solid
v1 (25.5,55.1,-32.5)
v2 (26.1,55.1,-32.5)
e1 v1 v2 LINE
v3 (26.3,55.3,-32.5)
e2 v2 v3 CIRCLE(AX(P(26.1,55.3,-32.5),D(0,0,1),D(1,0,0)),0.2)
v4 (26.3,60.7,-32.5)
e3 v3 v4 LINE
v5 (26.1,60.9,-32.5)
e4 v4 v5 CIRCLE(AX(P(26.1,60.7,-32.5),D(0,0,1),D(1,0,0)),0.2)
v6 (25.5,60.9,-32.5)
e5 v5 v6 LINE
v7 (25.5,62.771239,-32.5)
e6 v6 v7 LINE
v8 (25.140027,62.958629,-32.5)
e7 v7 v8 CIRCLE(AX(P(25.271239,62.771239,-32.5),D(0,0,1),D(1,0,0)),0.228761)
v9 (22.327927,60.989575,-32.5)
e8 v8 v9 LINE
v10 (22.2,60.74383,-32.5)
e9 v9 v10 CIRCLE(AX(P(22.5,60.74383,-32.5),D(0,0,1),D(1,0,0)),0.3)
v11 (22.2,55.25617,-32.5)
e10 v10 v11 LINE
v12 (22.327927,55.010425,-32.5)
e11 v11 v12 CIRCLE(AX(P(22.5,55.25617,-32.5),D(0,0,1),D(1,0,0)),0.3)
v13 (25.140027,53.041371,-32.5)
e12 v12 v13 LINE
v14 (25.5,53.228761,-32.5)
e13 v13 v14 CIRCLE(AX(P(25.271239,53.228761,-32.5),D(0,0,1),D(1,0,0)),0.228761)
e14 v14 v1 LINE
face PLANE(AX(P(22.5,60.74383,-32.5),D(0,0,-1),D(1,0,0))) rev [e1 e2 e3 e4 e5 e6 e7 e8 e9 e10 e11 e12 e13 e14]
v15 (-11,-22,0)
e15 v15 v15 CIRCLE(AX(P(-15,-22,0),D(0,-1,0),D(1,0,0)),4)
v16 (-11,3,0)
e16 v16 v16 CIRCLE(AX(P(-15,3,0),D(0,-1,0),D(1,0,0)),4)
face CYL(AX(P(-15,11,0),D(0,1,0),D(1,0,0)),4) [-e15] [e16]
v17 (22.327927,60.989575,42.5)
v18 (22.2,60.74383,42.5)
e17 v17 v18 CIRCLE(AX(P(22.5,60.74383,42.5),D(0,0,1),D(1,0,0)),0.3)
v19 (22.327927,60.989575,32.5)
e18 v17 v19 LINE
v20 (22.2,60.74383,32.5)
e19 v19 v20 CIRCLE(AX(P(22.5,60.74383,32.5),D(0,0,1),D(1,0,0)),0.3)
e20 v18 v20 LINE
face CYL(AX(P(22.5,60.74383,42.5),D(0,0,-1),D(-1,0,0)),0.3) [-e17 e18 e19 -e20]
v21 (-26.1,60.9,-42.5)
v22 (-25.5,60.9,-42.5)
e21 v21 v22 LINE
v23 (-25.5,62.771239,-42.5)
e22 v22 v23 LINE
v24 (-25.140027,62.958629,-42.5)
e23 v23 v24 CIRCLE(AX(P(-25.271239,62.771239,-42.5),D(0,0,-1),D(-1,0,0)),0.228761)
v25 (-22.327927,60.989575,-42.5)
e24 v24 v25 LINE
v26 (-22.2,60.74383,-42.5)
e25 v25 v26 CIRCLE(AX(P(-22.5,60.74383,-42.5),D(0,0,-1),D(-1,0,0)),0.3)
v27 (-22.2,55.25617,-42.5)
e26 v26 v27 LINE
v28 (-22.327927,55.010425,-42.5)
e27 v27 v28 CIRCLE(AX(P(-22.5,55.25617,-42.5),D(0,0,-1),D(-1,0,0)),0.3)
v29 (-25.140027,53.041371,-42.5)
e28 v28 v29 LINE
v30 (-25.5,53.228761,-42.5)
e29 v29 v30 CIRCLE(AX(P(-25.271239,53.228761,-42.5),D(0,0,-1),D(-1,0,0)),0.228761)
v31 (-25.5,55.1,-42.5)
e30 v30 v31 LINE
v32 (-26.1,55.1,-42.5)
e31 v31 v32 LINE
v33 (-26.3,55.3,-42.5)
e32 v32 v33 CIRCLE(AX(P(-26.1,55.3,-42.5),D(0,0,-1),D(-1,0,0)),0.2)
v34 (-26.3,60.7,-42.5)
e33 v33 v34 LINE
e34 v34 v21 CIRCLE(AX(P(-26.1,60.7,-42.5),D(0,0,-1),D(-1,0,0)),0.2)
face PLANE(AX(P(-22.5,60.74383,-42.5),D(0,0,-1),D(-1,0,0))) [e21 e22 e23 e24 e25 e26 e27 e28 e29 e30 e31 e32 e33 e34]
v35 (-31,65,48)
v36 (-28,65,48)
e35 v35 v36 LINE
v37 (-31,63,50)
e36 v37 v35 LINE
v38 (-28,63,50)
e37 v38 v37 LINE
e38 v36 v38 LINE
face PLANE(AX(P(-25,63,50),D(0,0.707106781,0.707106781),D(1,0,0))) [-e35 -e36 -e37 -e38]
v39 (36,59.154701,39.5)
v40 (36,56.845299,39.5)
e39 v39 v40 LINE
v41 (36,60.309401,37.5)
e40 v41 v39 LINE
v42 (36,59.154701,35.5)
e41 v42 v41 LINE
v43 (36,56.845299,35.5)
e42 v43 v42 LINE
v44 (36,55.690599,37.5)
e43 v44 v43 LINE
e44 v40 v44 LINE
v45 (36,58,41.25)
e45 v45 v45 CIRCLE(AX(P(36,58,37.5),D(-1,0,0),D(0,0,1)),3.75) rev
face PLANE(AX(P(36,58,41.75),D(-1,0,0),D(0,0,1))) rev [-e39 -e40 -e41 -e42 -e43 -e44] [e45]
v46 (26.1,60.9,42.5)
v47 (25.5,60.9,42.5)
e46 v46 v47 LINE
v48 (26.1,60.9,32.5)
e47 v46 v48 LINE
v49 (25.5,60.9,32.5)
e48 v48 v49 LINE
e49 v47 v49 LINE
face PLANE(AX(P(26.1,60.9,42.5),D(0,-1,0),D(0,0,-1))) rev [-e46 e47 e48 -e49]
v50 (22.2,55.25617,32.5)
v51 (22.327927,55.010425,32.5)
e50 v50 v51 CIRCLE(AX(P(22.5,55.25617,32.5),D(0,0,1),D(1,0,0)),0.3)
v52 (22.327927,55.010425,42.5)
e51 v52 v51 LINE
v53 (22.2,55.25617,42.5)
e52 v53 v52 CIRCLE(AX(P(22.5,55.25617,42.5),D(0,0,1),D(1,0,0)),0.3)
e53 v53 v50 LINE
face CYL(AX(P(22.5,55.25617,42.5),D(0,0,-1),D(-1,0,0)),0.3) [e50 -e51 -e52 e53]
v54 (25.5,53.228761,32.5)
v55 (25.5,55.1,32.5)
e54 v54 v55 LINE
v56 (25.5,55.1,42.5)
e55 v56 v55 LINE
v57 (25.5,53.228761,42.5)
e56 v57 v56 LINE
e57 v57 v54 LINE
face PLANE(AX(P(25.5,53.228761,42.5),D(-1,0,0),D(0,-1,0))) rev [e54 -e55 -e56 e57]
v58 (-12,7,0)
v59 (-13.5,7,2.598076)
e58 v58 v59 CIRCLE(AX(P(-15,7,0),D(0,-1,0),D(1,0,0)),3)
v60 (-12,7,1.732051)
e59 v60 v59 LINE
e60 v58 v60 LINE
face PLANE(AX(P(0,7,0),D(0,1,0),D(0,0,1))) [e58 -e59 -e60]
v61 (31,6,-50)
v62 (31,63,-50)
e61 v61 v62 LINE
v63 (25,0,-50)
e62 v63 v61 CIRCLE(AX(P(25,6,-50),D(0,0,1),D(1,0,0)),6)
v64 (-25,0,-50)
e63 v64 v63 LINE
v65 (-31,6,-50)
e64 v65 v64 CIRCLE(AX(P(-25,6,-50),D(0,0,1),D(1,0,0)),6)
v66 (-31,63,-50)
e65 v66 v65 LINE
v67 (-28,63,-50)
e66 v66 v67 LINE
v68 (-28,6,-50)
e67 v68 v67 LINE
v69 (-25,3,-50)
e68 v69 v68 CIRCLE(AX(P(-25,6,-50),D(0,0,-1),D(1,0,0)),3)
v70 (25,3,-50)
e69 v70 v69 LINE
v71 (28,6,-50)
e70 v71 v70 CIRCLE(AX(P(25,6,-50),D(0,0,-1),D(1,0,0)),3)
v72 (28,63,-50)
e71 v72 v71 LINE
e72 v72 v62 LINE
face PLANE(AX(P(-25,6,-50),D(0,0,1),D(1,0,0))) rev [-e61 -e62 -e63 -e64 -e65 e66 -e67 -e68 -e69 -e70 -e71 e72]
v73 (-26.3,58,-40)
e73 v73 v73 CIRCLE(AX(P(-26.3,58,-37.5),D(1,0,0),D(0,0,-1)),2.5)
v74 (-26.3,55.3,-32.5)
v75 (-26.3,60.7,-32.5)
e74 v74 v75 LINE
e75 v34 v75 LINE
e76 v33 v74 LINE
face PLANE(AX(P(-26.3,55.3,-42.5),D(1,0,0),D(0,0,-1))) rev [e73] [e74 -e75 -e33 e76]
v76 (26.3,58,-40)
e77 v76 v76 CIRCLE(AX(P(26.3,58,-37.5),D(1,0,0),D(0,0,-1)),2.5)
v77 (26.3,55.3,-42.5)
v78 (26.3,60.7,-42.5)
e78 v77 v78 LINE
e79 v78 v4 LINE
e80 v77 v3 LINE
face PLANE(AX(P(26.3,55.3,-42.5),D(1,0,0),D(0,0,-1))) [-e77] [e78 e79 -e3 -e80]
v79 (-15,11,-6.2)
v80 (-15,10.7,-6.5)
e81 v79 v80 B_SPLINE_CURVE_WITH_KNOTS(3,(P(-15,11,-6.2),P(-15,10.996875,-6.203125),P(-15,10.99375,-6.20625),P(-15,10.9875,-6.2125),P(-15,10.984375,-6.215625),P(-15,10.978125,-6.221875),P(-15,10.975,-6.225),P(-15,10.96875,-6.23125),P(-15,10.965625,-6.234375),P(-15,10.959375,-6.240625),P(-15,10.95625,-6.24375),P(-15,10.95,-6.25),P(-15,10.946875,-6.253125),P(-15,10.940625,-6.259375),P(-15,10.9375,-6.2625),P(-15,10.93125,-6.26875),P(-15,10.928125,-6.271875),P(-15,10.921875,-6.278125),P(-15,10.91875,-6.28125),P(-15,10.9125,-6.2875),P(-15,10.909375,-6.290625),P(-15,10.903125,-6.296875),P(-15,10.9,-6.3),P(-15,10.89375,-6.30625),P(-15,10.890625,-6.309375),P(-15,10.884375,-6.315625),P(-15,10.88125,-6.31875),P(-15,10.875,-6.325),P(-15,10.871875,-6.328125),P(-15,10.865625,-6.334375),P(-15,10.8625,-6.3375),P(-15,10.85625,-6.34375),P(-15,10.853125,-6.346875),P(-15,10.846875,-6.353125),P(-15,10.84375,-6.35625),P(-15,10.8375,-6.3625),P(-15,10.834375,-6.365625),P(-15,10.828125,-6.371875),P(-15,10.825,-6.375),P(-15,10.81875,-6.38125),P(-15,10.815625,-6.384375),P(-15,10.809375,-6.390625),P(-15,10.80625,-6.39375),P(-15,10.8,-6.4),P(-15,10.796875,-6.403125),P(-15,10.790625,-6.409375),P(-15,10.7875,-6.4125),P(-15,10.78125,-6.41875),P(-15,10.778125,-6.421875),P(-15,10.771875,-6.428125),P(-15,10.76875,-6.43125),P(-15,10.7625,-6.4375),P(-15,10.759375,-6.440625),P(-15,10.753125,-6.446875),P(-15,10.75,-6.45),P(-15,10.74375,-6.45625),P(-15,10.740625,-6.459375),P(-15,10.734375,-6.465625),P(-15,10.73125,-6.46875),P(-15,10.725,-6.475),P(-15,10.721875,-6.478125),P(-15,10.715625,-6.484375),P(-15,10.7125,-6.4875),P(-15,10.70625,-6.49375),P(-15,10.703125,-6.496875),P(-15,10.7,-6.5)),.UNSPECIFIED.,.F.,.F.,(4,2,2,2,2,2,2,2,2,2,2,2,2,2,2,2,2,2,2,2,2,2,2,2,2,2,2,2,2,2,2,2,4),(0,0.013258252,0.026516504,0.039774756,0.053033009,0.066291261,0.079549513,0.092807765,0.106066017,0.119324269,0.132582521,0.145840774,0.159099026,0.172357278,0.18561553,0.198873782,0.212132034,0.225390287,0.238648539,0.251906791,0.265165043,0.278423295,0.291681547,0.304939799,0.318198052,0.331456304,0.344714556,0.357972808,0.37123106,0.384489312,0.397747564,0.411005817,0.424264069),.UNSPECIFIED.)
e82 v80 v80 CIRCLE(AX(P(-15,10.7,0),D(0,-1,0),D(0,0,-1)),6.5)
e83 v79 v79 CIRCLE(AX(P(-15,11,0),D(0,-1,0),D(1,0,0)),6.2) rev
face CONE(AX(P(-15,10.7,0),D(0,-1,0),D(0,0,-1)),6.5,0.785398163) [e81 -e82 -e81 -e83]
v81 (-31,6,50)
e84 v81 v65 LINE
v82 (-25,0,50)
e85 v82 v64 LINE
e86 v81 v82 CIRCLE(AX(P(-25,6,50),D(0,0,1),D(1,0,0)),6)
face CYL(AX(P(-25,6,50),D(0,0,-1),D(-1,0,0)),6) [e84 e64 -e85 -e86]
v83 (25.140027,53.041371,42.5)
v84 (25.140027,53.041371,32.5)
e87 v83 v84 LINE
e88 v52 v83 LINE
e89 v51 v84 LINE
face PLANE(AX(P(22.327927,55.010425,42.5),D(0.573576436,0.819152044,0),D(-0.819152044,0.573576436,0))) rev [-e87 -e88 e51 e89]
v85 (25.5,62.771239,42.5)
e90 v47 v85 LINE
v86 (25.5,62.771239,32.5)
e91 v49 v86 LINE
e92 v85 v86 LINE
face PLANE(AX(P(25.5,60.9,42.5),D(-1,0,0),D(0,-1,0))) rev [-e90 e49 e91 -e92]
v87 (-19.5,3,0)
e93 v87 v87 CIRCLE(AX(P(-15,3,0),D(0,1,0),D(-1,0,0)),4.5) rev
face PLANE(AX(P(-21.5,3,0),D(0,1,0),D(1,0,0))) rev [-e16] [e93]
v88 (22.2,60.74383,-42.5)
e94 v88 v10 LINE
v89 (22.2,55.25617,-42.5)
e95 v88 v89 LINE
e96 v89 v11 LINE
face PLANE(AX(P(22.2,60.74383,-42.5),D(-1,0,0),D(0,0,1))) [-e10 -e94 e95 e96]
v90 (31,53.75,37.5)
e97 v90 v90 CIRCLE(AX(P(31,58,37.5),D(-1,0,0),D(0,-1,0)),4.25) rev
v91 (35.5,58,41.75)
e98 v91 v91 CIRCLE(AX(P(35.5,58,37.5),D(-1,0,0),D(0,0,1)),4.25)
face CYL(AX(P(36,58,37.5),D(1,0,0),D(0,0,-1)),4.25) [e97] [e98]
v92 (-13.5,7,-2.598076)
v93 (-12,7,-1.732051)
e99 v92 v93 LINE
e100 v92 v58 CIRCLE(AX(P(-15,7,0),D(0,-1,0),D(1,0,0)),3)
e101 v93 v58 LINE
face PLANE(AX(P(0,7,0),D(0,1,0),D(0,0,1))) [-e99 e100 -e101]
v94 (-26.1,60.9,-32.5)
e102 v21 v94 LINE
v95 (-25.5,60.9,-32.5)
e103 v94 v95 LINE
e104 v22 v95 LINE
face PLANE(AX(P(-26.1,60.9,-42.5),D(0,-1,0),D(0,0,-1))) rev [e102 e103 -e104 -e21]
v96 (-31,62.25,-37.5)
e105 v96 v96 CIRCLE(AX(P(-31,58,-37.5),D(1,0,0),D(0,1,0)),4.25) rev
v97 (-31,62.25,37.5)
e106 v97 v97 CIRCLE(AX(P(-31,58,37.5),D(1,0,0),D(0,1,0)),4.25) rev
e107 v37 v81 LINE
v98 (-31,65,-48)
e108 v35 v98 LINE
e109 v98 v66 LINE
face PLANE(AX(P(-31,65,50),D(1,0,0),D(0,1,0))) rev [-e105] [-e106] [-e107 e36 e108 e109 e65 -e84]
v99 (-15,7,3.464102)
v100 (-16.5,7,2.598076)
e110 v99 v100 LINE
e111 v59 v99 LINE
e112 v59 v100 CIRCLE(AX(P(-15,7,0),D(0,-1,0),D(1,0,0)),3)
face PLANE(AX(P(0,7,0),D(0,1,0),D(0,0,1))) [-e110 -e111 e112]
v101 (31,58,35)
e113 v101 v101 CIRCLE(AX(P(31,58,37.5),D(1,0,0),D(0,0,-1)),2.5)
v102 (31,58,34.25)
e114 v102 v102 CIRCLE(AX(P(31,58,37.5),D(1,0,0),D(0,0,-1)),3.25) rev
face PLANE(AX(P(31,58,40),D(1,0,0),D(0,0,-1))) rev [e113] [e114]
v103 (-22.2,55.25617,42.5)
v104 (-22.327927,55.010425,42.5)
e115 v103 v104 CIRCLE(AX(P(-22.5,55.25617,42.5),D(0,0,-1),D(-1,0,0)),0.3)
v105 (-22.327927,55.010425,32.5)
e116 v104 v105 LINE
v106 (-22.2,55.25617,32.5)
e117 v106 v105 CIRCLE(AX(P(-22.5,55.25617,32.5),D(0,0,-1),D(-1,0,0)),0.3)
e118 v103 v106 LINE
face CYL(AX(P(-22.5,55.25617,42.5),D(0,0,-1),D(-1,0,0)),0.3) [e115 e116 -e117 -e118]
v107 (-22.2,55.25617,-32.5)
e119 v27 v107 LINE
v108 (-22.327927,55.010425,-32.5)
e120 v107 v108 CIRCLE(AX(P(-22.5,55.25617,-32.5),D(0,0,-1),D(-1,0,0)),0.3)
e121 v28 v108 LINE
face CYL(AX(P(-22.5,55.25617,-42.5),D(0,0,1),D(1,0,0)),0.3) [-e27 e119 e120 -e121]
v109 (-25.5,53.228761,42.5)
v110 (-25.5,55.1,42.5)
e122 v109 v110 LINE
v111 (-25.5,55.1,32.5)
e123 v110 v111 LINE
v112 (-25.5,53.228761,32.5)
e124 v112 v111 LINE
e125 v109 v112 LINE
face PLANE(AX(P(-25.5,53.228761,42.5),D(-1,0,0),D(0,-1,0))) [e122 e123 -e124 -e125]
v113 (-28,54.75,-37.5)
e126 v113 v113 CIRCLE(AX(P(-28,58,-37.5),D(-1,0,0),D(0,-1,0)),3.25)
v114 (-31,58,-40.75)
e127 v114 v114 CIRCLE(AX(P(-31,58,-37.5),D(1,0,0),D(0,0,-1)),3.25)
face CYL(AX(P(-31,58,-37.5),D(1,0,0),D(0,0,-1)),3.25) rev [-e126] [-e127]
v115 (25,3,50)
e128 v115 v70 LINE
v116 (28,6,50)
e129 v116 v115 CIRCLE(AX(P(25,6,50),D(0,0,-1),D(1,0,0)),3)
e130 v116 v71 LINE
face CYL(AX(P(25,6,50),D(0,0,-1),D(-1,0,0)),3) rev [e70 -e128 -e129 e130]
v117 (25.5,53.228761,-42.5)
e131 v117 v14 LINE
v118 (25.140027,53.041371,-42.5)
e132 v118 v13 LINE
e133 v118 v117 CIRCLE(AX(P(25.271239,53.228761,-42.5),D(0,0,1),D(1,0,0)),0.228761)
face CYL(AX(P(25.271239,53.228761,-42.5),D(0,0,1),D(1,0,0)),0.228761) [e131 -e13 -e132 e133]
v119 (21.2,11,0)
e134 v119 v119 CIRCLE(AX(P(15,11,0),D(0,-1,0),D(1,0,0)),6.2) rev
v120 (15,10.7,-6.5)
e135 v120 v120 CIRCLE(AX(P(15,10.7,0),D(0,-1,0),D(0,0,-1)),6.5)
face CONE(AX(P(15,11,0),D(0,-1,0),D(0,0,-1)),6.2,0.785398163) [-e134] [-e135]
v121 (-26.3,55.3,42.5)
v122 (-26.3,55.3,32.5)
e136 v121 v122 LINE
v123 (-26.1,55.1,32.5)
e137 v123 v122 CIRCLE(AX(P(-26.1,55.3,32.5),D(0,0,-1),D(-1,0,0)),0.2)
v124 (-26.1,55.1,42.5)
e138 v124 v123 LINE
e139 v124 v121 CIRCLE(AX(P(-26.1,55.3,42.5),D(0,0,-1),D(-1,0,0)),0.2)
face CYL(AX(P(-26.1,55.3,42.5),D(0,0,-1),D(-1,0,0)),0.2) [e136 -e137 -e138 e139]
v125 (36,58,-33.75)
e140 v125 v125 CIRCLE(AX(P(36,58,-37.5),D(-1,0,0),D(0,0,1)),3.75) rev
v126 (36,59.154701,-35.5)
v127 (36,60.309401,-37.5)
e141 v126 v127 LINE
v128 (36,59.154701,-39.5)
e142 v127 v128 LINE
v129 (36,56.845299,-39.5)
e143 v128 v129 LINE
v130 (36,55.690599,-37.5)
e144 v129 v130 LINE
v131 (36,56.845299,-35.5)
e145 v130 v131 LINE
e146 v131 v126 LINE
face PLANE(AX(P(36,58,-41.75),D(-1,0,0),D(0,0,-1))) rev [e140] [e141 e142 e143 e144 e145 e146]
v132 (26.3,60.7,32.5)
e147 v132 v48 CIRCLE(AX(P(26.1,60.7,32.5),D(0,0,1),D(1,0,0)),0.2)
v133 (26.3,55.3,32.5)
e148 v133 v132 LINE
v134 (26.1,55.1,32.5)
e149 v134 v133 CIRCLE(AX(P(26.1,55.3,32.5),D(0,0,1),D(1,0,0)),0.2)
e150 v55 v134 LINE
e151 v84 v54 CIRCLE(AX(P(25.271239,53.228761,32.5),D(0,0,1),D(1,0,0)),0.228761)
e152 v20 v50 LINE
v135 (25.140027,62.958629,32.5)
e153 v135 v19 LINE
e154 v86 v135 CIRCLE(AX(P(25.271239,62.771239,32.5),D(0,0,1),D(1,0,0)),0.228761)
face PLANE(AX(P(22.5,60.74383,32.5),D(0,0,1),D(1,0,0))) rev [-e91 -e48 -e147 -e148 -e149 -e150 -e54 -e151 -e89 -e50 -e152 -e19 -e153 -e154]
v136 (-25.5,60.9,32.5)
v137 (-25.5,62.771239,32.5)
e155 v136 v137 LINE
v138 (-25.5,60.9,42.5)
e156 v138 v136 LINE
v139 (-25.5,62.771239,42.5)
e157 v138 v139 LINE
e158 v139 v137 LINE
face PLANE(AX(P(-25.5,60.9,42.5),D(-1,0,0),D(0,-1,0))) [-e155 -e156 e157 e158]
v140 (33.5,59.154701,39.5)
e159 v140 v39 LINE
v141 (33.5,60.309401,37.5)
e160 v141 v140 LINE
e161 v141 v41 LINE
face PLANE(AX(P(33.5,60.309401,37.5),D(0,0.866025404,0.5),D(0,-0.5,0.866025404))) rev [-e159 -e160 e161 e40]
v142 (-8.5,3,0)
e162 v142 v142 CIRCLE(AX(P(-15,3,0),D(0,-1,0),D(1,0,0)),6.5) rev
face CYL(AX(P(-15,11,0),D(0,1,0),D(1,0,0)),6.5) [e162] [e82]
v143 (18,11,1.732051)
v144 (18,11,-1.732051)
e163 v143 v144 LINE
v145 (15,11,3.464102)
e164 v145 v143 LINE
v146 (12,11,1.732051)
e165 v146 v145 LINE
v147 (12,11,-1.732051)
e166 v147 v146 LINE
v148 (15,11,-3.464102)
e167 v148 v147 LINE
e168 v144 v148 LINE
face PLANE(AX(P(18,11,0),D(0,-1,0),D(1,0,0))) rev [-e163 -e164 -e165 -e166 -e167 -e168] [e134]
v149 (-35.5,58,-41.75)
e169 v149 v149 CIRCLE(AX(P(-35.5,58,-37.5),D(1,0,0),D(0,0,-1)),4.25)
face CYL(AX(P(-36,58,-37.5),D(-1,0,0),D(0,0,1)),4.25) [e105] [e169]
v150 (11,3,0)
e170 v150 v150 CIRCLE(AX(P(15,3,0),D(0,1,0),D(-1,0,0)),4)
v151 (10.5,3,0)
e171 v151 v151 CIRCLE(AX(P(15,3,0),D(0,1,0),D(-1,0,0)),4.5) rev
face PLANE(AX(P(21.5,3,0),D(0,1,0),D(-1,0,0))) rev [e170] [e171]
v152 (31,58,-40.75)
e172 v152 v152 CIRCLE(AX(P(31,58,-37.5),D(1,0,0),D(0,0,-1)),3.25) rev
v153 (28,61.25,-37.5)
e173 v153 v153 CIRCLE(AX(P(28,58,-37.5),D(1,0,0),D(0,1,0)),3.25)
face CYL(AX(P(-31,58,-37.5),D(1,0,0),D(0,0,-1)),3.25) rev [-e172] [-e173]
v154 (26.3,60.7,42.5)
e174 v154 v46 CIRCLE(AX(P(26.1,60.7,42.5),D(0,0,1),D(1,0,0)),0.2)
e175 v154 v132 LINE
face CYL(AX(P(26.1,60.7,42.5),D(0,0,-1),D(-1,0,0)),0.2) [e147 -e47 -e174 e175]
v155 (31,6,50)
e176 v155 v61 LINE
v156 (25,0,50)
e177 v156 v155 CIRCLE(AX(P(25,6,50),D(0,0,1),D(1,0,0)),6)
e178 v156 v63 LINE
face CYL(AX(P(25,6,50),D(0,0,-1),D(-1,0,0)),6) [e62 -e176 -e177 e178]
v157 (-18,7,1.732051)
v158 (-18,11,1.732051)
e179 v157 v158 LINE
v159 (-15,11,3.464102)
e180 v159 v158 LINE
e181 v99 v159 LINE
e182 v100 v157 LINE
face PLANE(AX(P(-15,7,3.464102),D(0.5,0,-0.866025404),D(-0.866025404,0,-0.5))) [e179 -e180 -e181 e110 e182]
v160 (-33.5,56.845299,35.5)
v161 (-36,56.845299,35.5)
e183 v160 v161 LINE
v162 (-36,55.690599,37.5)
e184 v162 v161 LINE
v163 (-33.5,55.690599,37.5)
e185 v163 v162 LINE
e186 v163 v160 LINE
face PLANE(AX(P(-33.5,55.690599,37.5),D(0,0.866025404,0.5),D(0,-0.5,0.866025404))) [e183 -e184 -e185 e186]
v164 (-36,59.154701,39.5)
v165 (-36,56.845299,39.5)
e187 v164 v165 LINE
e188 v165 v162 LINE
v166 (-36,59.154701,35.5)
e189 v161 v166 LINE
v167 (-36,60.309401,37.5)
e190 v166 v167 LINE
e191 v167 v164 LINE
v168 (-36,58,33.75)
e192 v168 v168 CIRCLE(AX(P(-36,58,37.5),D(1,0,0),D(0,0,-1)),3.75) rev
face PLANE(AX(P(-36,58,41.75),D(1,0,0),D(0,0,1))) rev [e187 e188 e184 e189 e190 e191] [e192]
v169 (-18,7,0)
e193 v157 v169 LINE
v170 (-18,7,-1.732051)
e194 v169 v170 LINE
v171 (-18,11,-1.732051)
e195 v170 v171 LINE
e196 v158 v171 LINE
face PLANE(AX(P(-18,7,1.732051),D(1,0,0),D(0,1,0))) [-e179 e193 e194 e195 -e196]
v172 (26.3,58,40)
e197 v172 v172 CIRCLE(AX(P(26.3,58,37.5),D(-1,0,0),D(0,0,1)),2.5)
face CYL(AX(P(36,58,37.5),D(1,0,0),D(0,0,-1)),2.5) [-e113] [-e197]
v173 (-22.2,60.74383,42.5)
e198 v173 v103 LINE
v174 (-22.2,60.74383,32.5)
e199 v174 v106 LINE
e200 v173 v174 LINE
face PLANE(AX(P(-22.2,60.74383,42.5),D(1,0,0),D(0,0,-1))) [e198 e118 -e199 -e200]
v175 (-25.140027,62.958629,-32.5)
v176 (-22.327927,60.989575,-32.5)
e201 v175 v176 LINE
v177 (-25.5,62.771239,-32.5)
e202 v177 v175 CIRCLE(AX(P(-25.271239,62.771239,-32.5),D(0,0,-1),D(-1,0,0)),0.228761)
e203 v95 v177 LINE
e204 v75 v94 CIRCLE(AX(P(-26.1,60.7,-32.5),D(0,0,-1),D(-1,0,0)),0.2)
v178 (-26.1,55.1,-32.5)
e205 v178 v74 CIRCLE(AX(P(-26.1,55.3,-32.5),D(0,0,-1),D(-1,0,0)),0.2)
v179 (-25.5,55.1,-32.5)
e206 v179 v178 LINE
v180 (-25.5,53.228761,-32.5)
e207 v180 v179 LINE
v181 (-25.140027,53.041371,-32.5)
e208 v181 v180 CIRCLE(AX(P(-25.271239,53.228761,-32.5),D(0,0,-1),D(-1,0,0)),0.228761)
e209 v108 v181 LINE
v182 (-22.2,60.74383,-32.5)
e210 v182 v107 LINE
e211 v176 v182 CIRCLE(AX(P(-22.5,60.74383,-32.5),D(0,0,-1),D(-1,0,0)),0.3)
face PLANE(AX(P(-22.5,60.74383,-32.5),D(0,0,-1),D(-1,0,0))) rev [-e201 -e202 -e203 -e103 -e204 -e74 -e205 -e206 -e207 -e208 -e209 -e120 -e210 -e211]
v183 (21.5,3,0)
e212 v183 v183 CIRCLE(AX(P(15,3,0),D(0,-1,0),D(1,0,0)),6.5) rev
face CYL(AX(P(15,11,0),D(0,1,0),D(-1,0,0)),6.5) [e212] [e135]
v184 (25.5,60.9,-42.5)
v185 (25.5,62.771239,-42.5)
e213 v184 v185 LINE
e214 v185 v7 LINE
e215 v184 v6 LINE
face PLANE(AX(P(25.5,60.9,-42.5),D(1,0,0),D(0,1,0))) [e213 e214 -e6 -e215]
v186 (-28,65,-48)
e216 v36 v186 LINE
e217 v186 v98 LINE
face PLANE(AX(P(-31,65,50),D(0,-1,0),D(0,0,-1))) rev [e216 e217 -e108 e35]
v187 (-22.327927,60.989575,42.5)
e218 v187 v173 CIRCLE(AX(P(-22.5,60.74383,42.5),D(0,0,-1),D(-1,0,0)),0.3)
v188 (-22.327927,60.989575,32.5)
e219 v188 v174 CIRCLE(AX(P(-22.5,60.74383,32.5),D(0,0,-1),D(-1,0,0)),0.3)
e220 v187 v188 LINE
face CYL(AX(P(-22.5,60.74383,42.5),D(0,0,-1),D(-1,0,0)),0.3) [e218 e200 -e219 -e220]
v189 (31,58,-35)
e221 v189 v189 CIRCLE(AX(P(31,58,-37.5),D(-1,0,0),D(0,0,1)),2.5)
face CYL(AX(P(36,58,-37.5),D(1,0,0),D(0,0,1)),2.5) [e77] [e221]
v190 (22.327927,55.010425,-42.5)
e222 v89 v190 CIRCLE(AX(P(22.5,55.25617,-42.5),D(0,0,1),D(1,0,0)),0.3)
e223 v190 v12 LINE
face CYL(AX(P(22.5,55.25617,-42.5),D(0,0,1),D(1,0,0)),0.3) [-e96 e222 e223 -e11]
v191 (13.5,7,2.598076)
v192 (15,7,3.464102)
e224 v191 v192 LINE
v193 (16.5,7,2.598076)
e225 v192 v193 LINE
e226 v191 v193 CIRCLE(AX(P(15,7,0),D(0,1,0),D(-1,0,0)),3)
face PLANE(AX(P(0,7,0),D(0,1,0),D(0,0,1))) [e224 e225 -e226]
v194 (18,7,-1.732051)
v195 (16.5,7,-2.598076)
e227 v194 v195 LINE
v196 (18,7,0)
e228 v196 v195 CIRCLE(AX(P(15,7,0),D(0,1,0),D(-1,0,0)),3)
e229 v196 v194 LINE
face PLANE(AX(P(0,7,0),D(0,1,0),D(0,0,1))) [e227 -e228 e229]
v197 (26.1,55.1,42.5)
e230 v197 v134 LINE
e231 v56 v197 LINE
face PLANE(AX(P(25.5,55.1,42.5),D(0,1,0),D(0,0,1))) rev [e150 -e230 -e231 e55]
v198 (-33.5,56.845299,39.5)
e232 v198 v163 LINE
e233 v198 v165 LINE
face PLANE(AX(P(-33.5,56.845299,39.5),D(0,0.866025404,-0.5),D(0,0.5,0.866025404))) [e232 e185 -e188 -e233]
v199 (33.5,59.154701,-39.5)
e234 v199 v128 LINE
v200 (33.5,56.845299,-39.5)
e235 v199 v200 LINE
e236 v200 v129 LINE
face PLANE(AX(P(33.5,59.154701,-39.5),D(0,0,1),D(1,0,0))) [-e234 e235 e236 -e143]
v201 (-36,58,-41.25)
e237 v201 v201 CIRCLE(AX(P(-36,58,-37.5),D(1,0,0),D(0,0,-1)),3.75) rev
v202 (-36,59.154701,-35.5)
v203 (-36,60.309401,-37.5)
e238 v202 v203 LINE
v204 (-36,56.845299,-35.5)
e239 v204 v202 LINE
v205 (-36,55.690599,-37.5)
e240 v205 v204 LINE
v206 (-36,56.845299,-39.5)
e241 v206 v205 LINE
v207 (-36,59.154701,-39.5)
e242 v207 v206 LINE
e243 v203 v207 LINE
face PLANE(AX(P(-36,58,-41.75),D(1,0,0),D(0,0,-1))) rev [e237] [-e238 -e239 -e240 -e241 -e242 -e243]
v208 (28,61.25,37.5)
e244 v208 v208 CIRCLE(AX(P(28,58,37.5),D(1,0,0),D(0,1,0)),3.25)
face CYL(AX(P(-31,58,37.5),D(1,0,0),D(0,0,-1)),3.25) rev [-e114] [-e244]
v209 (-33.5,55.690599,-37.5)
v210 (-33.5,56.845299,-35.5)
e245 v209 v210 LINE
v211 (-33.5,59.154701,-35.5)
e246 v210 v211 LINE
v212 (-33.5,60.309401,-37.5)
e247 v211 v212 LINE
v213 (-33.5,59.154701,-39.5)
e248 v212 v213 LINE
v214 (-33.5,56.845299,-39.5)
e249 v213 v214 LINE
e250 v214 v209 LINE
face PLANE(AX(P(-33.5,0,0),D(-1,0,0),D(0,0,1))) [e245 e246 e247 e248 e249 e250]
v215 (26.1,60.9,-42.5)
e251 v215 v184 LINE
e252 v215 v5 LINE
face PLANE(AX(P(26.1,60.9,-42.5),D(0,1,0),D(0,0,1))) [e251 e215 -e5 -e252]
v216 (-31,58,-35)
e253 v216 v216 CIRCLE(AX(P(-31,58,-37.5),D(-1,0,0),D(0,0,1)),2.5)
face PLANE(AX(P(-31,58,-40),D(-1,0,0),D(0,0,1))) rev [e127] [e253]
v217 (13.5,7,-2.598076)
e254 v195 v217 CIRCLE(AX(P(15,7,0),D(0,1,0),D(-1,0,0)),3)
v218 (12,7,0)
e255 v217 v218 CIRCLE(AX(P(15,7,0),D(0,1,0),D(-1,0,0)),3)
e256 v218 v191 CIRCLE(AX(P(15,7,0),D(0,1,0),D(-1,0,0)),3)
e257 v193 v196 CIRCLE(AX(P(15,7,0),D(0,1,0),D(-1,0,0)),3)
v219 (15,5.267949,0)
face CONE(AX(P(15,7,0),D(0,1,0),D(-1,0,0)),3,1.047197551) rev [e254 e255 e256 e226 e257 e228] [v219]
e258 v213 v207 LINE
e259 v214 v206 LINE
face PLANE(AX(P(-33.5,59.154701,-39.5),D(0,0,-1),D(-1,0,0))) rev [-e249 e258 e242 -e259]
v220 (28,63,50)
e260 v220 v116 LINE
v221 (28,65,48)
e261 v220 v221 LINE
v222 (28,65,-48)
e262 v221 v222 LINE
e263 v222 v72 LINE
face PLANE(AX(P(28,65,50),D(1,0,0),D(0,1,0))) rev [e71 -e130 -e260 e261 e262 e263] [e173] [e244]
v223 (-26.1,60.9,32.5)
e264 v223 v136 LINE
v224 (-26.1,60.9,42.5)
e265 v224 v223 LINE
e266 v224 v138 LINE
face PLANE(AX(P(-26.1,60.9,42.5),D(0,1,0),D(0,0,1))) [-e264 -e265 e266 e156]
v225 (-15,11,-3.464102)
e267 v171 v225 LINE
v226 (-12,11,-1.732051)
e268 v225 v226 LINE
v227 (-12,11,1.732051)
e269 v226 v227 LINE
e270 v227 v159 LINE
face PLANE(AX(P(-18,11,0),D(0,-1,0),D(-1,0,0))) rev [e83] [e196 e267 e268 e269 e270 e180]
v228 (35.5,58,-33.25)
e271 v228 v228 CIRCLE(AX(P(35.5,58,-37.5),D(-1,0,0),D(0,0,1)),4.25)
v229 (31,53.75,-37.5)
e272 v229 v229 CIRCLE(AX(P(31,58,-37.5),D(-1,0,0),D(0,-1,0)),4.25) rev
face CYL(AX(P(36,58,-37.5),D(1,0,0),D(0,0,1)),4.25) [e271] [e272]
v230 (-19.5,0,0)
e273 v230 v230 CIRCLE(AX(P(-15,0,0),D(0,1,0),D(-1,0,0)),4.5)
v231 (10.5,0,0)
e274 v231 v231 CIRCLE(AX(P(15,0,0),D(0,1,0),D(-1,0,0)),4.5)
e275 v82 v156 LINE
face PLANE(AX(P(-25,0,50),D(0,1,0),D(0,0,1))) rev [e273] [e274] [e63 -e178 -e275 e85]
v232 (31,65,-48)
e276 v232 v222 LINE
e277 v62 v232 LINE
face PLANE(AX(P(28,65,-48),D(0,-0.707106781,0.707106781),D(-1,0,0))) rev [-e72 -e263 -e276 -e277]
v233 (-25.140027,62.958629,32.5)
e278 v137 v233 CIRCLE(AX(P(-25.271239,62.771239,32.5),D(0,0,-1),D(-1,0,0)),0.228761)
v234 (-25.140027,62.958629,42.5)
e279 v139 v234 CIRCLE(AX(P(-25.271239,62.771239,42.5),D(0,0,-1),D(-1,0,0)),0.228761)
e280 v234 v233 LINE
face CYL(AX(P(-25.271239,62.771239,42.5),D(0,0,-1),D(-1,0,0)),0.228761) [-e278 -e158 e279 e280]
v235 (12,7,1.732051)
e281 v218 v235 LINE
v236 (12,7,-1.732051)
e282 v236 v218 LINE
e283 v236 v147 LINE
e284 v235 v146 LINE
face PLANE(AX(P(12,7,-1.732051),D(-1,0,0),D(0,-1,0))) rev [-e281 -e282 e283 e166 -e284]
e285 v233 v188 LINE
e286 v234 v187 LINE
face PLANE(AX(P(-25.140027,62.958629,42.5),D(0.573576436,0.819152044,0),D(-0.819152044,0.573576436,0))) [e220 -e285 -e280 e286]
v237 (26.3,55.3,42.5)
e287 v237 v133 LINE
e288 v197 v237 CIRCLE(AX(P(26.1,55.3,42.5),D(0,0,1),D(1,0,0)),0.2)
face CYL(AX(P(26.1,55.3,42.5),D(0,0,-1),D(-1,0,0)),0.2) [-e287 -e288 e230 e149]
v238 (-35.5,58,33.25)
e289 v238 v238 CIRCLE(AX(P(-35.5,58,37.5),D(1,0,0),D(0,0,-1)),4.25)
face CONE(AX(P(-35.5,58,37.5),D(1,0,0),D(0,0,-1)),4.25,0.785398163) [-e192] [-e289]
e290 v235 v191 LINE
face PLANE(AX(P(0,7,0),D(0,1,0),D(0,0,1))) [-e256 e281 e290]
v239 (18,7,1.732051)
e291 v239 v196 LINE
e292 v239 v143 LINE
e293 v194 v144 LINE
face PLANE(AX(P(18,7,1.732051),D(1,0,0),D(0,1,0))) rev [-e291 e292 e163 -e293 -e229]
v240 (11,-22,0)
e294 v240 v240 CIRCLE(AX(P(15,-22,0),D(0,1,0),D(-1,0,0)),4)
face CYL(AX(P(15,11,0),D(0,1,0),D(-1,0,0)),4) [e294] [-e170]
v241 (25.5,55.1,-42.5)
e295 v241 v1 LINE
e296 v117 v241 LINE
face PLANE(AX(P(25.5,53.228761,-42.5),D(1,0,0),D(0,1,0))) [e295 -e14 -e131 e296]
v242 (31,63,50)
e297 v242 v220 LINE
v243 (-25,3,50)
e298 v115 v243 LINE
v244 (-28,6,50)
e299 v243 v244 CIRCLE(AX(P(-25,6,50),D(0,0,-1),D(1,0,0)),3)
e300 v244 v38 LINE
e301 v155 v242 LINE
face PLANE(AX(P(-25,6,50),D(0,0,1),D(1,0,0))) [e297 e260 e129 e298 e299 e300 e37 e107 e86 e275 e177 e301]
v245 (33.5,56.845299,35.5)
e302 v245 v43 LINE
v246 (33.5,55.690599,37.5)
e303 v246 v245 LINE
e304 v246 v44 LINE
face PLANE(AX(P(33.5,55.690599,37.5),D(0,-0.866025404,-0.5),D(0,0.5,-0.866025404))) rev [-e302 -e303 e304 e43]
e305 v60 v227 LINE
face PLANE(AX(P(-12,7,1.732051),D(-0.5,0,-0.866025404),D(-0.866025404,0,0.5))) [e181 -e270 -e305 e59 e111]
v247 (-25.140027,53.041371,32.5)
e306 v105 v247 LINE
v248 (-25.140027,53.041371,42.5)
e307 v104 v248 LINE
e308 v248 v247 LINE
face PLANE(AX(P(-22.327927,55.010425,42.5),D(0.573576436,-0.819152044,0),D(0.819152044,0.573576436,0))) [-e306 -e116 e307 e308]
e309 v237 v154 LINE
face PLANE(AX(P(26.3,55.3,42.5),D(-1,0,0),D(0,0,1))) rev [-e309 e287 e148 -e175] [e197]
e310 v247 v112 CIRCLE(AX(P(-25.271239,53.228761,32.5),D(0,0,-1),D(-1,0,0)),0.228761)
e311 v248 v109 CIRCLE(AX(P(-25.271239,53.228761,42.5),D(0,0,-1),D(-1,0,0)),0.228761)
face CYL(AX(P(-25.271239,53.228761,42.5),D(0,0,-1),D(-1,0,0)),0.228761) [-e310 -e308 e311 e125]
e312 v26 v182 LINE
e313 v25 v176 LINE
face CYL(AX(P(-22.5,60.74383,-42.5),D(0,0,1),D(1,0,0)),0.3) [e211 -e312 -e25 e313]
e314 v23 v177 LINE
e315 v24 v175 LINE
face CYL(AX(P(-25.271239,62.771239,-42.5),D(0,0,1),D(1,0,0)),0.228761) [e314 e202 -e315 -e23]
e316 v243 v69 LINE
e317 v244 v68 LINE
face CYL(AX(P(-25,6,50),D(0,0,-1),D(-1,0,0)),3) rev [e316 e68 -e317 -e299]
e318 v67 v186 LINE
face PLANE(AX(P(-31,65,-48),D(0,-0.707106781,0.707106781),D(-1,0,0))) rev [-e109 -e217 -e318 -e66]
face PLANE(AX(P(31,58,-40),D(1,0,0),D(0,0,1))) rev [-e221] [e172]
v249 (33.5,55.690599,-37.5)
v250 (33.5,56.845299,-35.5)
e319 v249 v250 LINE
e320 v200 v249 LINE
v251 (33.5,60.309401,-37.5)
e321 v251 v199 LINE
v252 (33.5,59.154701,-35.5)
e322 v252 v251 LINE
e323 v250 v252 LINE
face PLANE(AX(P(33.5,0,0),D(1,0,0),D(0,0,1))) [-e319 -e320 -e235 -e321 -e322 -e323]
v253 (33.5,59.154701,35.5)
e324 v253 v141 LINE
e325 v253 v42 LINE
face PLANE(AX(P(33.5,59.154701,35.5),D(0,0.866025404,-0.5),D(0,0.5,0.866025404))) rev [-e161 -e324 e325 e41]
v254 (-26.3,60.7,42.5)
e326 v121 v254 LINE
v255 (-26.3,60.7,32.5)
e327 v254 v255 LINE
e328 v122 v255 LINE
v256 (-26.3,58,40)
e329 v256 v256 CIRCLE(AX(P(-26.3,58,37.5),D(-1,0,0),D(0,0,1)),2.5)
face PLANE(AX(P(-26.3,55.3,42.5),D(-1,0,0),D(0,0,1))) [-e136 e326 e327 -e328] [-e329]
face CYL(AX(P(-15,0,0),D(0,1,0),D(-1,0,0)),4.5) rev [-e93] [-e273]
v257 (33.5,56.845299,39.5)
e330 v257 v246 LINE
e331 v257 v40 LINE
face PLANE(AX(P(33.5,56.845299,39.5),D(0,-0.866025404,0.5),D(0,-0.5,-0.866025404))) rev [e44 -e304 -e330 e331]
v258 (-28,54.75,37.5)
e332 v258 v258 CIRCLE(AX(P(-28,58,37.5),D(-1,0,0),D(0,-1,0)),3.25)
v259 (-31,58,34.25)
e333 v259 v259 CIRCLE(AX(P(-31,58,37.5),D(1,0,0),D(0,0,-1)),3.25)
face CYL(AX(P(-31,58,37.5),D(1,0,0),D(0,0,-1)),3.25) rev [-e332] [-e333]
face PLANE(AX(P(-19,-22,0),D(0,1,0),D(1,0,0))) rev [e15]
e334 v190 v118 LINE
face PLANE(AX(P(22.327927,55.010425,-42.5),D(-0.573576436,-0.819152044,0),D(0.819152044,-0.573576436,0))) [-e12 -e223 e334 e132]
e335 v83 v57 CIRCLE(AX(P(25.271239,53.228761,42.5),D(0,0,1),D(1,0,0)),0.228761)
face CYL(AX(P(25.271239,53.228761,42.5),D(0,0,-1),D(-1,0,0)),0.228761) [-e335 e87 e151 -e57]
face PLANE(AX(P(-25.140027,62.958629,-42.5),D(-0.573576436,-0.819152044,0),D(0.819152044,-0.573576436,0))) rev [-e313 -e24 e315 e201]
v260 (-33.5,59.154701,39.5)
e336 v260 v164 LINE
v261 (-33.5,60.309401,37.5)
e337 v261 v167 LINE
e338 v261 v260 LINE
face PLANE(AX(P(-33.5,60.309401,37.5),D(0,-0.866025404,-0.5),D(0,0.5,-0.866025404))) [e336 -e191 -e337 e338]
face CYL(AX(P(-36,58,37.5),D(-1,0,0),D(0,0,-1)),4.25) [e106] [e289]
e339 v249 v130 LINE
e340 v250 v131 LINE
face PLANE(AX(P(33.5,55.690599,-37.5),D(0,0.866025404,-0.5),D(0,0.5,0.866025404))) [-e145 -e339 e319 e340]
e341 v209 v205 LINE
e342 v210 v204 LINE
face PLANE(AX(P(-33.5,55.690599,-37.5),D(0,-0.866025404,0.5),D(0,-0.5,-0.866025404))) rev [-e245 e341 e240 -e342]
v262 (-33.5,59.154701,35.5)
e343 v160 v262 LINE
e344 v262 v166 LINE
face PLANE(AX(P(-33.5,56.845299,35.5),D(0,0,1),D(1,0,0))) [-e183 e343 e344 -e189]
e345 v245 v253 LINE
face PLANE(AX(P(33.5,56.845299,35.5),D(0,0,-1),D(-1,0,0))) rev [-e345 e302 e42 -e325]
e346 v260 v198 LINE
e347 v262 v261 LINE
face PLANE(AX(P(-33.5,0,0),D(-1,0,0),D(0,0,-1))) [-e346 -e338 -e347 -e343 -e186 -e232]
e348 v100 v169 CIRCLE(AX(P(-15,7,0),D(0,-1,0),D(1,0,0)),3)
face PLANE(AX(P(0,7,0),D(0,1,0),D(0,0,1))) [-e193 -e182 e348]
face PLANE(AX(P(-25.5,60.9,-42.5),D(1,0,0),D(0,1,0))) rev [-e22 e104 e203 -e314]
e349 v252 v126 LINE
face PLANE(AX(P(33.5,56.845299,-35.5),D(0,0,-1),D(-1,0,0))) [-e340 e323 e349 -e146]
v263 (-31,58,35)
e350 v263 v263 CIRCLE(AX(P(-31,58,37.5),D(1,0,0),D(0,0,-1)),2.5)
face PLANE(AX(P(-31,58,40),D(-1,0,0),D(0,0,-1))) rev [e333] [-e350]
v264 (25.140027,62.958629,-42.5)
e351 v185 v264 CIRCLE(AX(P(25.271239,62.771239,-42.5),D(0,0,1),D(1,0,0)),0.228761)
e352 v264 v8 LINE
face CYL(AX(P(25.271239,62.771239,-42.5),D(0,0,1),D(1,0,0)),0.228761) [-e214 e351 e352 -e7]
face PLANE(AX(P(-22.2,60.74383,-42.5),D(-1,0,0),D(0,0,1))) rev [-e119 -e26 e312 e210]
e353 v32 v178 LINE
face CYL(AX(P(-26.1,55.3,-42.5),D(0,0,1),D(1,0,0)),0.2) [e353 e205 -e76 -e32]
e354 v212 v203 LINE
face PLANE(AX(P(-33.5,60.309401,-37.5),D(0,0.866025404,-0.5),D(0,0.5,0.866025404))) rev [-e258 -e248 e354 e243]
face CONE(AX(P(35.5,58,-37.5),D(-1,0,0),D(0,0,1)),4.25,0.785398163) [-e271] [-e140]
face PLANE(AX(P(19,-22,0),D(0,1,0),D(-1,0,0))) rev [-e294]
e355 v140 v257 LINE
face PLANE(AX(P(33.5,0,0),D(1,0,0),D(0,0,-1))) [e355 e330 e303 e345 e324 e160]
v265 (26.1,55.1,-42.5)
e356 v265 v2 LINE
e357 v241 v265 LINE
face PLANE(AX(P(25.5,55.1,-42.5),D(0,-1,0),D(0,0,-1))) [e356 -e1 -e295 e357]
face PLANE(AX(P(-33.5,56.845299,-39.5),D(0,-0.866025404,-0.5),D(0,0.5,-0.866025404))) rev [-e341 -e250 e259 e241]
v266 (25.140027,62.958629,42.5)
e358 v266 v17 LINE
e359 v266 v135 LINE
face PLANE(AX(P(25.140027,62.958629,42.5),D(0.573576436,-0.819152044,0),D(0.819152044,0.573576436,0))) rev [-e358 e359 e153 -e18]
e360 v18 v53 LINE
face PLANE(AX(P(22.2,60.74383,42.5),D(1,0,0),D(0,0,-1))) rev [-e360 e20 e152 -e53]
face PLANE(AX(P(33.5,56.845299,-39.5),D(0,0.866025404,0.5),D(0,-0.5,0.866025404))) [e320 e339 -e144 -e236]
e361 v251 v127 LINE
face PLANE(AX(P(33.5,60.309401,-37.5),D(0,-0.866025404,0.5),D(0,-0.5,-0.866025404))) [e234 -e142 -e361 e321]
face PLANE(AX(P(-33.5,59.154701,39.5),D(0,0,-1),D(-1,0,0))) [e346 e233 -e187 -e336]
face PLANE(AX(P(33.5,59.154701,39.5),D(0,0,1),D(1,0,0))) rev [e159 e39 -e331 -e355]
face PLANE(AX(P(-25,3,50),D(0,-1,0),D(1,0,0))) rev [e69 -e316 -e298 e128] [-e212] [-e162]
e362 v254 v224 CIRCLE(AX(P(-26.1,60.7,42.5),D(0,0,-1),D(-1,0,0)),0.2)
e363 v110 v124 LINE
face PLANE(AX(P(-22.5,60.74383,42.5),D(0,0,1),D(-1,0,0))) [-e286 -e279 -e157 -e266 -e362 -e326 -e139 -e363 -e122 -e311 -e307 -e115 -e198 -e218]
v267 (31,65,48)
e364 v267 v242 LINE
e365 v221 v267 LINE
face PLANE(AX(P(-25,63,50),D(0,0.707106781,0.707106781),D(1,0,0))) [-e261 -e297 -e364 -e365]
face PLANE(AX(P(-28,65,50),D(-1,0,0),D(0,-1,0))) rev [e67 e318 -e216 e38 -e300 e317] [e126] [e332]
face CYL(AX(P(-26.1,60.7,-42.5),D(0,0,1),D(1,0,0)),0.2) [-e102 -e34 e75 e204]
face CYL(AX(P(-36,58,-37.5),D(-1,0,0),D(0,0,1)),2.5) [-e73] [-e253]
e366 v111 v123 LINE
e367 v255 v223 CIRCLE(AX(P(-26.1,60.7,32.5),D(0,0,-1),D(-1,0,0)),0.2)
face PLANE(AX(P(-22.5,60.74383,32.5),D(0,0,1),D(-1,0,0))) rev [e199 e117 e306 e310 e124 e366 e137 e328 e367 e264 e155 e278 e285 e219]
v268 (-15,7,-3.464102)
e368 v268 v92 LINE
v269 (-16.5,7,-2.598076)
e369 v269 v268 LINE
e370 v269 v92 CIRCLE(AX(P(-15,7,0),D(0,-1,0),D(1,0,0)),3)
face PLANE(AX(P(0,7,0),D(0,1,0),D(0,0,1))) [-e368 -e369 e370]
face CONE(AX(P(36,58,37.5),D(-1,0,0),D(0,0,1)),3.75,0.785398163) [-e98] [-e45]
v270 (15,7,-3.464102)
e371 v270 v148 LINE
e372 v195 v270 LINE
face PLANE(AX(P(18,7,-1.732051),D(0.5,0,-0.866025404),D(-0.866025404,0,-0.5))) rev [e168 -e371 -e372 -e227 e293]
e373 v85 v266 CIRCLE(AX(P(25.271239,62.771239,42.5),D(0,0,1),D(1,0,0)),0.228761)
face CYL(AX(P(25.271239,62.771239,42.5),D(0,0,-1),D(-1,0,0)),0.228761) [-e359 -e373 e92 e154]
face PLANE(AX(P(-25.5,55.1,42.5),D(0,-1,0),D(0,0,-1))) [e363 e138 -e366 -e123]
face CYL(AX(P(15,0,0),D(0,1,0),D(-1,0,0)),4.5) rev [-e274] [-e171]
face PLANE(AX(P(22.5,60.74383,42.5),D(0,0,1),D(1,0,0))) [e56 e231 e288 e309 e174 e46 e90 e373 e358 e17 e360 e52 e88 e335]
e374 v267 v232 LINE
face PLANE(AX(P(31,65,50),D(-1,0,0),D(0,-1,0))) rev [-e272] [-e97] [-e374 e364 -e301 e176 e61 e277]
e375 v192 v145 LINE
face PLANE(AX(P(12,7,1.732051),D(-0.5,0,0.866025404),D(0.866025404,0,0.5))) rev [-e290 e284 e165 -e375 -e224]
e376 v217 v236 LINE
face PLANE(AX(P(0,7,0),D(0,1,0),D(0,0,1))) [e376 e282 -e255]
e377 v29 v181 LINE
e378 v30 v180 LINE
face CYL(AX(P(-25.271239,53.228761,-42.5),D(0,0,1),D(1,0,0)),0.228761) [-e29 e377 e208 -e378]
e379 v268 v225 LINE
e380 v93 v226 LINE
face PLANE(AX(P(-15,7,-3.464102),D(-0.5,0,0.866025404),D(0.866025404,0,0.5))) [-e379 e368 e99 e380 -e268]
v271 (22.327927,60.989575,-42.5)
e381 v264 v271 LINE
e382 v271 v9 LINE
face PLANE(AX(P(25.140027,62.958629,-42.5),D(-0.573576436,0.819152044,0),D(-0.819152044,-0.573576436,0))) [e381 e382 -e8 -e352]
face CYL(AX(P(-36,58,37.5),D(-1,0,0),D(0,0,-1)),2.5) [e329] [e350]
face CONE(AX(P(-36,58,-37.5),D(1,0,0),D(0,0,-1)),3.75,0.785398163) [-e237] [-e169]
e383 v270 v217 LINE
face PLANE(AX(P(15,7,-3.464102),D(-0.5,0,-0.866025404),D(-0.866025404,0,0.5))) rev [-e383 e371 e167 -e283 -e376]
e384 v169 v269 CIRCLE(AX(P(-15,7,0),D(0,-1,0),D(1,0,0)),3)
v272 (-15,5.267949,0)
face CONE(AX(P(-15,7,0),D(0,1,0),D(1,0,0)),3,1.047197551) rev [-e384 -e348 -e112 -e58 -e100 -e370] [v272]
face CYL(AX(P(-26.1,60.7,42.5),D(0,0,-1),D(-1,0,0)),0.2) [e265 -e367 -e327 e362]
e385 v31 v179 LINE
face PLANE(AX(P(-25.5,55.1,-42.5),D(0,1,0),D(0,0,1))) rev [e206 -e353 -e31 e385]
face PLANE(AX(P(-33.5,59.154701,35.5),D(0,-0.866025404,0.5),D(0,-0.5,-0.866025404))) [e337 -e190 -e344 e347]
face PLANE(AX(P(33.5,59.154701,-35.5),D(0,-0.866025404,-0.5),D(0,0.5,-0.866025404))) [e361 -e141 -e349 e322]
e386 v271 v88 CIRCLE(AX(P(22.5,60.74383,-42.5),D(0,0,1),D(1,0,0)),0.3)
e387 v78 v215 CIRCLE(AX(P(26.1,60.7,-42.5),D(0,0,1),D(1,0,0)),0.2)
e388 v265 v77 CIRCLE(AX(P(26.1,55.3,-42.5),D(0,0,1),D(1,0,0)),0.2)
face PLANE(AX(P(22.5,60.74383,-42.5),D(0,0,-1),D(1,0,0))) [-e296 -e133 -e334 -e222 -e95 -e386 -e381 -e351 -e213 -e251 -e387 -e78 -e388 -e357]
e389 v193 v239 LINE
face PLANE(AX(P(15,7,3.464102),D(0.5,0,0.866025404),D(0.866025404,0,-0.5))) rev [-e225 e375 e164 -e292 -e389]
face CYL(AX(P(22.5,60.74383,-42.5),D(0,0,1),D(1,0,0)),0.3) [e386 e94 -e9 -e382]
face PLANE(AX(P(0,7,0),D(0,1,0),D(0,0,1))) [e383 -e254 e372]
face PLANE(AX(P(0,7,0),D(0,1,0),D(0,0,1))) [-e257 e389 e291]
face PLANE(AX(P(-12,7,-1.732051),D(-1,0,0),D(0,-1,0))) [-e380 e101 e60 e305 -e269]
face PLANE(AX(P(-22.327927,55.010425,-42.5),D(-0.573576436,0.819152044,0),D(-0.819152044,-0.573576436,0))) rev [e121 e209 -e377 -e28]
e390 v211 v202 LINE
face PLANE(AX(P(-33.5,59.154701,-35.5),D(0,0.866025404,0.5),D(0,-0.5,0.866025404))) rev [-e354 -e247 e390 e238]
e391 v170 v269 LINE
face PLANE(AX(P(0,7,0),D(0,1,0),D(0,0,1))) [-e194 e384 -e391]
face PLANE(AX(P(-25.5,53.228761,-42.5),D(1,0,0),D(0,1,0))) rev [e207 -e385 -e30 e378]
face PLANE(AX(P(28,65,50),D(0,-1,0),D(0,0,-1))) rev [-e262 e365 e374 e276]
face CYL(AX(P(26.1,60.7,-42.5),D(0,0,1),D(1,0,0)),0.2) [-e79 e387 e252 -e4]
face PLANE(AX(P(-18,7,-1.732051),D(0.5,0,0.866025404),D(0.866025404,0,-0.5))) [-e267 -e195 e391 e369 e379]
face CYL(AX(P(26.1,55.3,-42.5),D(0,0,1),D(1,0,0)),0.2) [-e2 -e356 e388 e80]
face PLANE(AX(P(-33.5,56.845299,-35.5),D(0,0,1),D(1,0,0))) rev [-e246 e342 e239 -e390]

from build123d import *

# Parameters (mm, degrees)
BOSS_EXTRUDE1_DEPTH      = 50
SKETCH2_R                = 3.25
CUT_EXTRUDE1_DEPTH       = 103.805641869
CHAMFER1_SIZE            = 2
SKETCH3_R                = 4.5
CUT_EXTRUDE2_DEPTH       = 86.469292731
CUT_EXTRUDE3_DEPTH       = 2.5
CHAMFER2_SIZE            = 0.5
BOSS_EXTRUDE2_DEPTH      = 5
CHAMFER2_OF_MIRROR1_SIZE = 0.5
CUT_EXTRUDE4_DEPTH       = 4
CHAMFER3_SIZE            = 0.3


# Read off the part's stored shape, not the designer's step: Mirror2
with BuildPart() as part:
    # Sketch1 → Boss-Extrude1 (new, symmetric)
    with BuildSketch(Plane.XY):
        with BuildLine():
            Line((-25, 0), (25, 0))
            ThreePointArc((25, 0), (29.242640687, 1.757359313), (31, 6))
            Line((31, 6), (31, 65))
            Line((31, 65), (28, 65))
            Line((28, 65), (28, 6))
            ThreePointArc((28, 6), (27.121320344, 3.878679656), (25, 3))
            Line((25, 3), (-25, 3))
            ThreePointArc((-25, 3), (-27.121320344, 3.878679656), (-28, 6))
            Line((-28, 6), (-28, 65))
            Line((-28, 65), (-31, 65))
            Line((-31, 65), (-31, 6))
            ThreePointArc((-31, 6), (-29.242640687, 1.757359313), (-25, 0))
        make_face()
    extrude(amount=BOSS_EXTRUDE1_DEPTH, both=True)

    # Sketch2 → Cut-Extrude1 (cut, through all)
    with BuildSketch(Plane(origin=(31, 0, 0), x_dir=(0, 0, -1), z_dir=(1, 0, 0))):
        with Locations((-37.5, 58)):
            Circle(SKETCH2_R)
        with Locations((37.5, 58)):
            Circle(SKETCH2_R)
    extrude(amount=-CUT_EXTRUDE1_DEPTH, mode=Mode.SUBTRACT)

    # Chamfer1
    chamfer1_edges = [part.edges().sort_by_distance(p)[0] for p in [
        (-29.5, 65, -50),
        (29.5, 65, -50),
        (29.5, 65, 50),
        (-29.5, 65, 50),
    ]]
    chamfer(chamfer1_edges, length=CHAMFER1_SIZE)

    # Sketch3 → Cut-Extrude2 (cut, through all)
    with BuildSketch(Plane(origin=(0, 3, 0), x_dir=(1, 0, 0), z_dir=(0, 1, 0))):
        with Locations(Location((-15, 0, 0), (0, 0, 180))):
            Circle(SKETCH3_R)
        with Locations(Location((15, 0, 0), (0, 0, 180))):
            Circle(SKETCH3_R)
    extrude(amount=-CUT_EXTRUDE2_DEPTH, mode=Mode.SUBTRACT)

    # Sketch4 → Revolve1 (revolve)
    with BuildSketch(Plane(origin=(0, 58, 0), x_dir=(1, 0, 0), z_dir=(0, 1, 0)), mode=Mode.PRIVATE) as revolve1_sk:
        Polygon((23, -40), (31, -40), (31, -41.75), (36, -41.75), (36, -37.5), (23, -37.5), align=None)
    revolve1 = revolve(revolve1_sk.sketch.rotate(Axis((36, 58, 37.5), (-1, 0, 0)), 180), axis=Axis((36, 58, 37.5), (-1, 0, 0)))

    # Sketch5 → Cut-Extrude3 (cut)
    with BuildSketch(Plane(origin=(36, 0, 0), x_dir=(0, 0, -1), z_dir=(1, 0, 0))):
        Polygon((-37.5, 60.309401077), (-39.5, 59.154700538), (-39.5, 56.845299462), (-37.5, 55.690598923), (-35.5, 56.845299462), (-35.5, 59.154700538), align=None)
    cut_extrude3 = extrude(amount=-CUT_EXTRUDE3_DEPTH, mode=Mode.SUBTRACT)

    # Chamfer2
    chamfer2_edges = [part.edges().sort_by_distance(p)[0] for p in [
        (36, 58, 41.75),
    ]]
    chamfer(chamfer2_edges, length=CHAMFER2_SIZE)

    # Sketch6 → Boss-Extrude2 (add, symmetric)
    with BuildSketch(Plane.XY.offset(37.5)):
        with BuildLine():
            Line((22.2, 60.743829885), (22.2, 55.256170115))
            ThreePointArc((22.2, 55.256170115), (22.23389675, 55.117645531), (22.327927069, 55.010424502))
            Line((22.327927069, 55.010424502), (25.140026938, 53.041370976))
            ThreePointArc((25.140026938, 53.041370976), (25.376869026, 53.025847525), (25.5, 53.228761091))
            Line((25.5, 53.228761091), (25.5, 55.1))
            Line((25.5, 55.1), (26.1, 55.1))
            ThreePointArc((26.1, 55.1), (26.241421356, 55.158578644), (26.3, 55.3))
            Line((26.3, 55.3), (26.3, 60.7))
            ThreePointArc((26.3, 60.7), (26.241421356, 60.841421356), (26.1, 60.9))
            Line((26.1, 60.9), (25.5, 60.9))
            Line((25.5, 60.9), (25.5, 62.771238909))
            ThreePointArc((25.5, 62.771238909), (25.376869026, 62.974152475), (25.140026938, 62.958629024))
            Line((25.140026938, 62.958629024), (22.327927069, 60.989575498))
            ThreePointArc((22.327927069, 60.989575498), (22.23389675, 60.882354469), (22.2, 60.743829885))
        make_face()
    boss_extrude2 = extrude(amount=BOSS_EXTRUDE2_DEPTH, both=True)

    # Mirror1: Revolve1, Cut-Extrude3, Boss-Extrude2 across plane
    add(revolve1.mirror(Plane.XY))
    add(cut_extrude3.mirror(Plane.XY), mode=Mode.SUBTRACT)
    add(boss_extrude2.mirror(Plane.XY))

    # Chamfer2 of Mirror1
    chamfer2_of_mirror1_edges = [part.edges().sort_by_distance(p)[0] for p in [
        (36, 58, -41.75),
    ]]
    chamfer(chamfer2_of_mirror1_edges, length=CHAMFER2_OF_MIRROR1_SIZE)

    # Sketch7 → Revolve2 (revolve)
    with BuildSketch(Plane.XY, mode=Mode.PRIVATE) as revolve2_sk:
        Polygon((18, 11), (21.5, 11), (21.5, 3), (19, 3), (19, -22), (15, -22), (15, 5.267949192), (18, 7), align=None)
    revolve(revolve2_sk.sketch.rotate(Axis((15, 11, 0), (0, -1, 0)), 180), axis=Axis((15, 11, 0), (0, -1, 0)))

    # Sketch8 → Cut-Extrude4 (cut)
    with BuildSketch(Plane(origin=(0, 11, 0), x_dir=(1, 0, 0), z_dir=(0, 1, 0))):
        Polygon((15, 3.464101615), (12, 1.732050808), (12, -1.732050808), (15, -3.464101615), (18, -1.732050808), (18, 1.732050808), align=None)
    extrude(amount=-CUT_EXTRUDE4_DEPTH, mode=Mode.SUBTRACT)

    # Chamfer3
    chamfer3_edges = [part.edges().sort_by_distance(p)[0] for p in [
        (21.5, 11, 0),
    ]]
    chamfer(chamfer3_edges, length=CHAMFER3_SIZE)

    # Mirror2: part across plane


with BuildPart() as part_1:
    add(part.part)
    add(part.part.mirror(Plane(origin=(0, 0, 0), x_dir=(0, 0, 1), z_dir=(1, 0, 0))))


solid = part_1.part
